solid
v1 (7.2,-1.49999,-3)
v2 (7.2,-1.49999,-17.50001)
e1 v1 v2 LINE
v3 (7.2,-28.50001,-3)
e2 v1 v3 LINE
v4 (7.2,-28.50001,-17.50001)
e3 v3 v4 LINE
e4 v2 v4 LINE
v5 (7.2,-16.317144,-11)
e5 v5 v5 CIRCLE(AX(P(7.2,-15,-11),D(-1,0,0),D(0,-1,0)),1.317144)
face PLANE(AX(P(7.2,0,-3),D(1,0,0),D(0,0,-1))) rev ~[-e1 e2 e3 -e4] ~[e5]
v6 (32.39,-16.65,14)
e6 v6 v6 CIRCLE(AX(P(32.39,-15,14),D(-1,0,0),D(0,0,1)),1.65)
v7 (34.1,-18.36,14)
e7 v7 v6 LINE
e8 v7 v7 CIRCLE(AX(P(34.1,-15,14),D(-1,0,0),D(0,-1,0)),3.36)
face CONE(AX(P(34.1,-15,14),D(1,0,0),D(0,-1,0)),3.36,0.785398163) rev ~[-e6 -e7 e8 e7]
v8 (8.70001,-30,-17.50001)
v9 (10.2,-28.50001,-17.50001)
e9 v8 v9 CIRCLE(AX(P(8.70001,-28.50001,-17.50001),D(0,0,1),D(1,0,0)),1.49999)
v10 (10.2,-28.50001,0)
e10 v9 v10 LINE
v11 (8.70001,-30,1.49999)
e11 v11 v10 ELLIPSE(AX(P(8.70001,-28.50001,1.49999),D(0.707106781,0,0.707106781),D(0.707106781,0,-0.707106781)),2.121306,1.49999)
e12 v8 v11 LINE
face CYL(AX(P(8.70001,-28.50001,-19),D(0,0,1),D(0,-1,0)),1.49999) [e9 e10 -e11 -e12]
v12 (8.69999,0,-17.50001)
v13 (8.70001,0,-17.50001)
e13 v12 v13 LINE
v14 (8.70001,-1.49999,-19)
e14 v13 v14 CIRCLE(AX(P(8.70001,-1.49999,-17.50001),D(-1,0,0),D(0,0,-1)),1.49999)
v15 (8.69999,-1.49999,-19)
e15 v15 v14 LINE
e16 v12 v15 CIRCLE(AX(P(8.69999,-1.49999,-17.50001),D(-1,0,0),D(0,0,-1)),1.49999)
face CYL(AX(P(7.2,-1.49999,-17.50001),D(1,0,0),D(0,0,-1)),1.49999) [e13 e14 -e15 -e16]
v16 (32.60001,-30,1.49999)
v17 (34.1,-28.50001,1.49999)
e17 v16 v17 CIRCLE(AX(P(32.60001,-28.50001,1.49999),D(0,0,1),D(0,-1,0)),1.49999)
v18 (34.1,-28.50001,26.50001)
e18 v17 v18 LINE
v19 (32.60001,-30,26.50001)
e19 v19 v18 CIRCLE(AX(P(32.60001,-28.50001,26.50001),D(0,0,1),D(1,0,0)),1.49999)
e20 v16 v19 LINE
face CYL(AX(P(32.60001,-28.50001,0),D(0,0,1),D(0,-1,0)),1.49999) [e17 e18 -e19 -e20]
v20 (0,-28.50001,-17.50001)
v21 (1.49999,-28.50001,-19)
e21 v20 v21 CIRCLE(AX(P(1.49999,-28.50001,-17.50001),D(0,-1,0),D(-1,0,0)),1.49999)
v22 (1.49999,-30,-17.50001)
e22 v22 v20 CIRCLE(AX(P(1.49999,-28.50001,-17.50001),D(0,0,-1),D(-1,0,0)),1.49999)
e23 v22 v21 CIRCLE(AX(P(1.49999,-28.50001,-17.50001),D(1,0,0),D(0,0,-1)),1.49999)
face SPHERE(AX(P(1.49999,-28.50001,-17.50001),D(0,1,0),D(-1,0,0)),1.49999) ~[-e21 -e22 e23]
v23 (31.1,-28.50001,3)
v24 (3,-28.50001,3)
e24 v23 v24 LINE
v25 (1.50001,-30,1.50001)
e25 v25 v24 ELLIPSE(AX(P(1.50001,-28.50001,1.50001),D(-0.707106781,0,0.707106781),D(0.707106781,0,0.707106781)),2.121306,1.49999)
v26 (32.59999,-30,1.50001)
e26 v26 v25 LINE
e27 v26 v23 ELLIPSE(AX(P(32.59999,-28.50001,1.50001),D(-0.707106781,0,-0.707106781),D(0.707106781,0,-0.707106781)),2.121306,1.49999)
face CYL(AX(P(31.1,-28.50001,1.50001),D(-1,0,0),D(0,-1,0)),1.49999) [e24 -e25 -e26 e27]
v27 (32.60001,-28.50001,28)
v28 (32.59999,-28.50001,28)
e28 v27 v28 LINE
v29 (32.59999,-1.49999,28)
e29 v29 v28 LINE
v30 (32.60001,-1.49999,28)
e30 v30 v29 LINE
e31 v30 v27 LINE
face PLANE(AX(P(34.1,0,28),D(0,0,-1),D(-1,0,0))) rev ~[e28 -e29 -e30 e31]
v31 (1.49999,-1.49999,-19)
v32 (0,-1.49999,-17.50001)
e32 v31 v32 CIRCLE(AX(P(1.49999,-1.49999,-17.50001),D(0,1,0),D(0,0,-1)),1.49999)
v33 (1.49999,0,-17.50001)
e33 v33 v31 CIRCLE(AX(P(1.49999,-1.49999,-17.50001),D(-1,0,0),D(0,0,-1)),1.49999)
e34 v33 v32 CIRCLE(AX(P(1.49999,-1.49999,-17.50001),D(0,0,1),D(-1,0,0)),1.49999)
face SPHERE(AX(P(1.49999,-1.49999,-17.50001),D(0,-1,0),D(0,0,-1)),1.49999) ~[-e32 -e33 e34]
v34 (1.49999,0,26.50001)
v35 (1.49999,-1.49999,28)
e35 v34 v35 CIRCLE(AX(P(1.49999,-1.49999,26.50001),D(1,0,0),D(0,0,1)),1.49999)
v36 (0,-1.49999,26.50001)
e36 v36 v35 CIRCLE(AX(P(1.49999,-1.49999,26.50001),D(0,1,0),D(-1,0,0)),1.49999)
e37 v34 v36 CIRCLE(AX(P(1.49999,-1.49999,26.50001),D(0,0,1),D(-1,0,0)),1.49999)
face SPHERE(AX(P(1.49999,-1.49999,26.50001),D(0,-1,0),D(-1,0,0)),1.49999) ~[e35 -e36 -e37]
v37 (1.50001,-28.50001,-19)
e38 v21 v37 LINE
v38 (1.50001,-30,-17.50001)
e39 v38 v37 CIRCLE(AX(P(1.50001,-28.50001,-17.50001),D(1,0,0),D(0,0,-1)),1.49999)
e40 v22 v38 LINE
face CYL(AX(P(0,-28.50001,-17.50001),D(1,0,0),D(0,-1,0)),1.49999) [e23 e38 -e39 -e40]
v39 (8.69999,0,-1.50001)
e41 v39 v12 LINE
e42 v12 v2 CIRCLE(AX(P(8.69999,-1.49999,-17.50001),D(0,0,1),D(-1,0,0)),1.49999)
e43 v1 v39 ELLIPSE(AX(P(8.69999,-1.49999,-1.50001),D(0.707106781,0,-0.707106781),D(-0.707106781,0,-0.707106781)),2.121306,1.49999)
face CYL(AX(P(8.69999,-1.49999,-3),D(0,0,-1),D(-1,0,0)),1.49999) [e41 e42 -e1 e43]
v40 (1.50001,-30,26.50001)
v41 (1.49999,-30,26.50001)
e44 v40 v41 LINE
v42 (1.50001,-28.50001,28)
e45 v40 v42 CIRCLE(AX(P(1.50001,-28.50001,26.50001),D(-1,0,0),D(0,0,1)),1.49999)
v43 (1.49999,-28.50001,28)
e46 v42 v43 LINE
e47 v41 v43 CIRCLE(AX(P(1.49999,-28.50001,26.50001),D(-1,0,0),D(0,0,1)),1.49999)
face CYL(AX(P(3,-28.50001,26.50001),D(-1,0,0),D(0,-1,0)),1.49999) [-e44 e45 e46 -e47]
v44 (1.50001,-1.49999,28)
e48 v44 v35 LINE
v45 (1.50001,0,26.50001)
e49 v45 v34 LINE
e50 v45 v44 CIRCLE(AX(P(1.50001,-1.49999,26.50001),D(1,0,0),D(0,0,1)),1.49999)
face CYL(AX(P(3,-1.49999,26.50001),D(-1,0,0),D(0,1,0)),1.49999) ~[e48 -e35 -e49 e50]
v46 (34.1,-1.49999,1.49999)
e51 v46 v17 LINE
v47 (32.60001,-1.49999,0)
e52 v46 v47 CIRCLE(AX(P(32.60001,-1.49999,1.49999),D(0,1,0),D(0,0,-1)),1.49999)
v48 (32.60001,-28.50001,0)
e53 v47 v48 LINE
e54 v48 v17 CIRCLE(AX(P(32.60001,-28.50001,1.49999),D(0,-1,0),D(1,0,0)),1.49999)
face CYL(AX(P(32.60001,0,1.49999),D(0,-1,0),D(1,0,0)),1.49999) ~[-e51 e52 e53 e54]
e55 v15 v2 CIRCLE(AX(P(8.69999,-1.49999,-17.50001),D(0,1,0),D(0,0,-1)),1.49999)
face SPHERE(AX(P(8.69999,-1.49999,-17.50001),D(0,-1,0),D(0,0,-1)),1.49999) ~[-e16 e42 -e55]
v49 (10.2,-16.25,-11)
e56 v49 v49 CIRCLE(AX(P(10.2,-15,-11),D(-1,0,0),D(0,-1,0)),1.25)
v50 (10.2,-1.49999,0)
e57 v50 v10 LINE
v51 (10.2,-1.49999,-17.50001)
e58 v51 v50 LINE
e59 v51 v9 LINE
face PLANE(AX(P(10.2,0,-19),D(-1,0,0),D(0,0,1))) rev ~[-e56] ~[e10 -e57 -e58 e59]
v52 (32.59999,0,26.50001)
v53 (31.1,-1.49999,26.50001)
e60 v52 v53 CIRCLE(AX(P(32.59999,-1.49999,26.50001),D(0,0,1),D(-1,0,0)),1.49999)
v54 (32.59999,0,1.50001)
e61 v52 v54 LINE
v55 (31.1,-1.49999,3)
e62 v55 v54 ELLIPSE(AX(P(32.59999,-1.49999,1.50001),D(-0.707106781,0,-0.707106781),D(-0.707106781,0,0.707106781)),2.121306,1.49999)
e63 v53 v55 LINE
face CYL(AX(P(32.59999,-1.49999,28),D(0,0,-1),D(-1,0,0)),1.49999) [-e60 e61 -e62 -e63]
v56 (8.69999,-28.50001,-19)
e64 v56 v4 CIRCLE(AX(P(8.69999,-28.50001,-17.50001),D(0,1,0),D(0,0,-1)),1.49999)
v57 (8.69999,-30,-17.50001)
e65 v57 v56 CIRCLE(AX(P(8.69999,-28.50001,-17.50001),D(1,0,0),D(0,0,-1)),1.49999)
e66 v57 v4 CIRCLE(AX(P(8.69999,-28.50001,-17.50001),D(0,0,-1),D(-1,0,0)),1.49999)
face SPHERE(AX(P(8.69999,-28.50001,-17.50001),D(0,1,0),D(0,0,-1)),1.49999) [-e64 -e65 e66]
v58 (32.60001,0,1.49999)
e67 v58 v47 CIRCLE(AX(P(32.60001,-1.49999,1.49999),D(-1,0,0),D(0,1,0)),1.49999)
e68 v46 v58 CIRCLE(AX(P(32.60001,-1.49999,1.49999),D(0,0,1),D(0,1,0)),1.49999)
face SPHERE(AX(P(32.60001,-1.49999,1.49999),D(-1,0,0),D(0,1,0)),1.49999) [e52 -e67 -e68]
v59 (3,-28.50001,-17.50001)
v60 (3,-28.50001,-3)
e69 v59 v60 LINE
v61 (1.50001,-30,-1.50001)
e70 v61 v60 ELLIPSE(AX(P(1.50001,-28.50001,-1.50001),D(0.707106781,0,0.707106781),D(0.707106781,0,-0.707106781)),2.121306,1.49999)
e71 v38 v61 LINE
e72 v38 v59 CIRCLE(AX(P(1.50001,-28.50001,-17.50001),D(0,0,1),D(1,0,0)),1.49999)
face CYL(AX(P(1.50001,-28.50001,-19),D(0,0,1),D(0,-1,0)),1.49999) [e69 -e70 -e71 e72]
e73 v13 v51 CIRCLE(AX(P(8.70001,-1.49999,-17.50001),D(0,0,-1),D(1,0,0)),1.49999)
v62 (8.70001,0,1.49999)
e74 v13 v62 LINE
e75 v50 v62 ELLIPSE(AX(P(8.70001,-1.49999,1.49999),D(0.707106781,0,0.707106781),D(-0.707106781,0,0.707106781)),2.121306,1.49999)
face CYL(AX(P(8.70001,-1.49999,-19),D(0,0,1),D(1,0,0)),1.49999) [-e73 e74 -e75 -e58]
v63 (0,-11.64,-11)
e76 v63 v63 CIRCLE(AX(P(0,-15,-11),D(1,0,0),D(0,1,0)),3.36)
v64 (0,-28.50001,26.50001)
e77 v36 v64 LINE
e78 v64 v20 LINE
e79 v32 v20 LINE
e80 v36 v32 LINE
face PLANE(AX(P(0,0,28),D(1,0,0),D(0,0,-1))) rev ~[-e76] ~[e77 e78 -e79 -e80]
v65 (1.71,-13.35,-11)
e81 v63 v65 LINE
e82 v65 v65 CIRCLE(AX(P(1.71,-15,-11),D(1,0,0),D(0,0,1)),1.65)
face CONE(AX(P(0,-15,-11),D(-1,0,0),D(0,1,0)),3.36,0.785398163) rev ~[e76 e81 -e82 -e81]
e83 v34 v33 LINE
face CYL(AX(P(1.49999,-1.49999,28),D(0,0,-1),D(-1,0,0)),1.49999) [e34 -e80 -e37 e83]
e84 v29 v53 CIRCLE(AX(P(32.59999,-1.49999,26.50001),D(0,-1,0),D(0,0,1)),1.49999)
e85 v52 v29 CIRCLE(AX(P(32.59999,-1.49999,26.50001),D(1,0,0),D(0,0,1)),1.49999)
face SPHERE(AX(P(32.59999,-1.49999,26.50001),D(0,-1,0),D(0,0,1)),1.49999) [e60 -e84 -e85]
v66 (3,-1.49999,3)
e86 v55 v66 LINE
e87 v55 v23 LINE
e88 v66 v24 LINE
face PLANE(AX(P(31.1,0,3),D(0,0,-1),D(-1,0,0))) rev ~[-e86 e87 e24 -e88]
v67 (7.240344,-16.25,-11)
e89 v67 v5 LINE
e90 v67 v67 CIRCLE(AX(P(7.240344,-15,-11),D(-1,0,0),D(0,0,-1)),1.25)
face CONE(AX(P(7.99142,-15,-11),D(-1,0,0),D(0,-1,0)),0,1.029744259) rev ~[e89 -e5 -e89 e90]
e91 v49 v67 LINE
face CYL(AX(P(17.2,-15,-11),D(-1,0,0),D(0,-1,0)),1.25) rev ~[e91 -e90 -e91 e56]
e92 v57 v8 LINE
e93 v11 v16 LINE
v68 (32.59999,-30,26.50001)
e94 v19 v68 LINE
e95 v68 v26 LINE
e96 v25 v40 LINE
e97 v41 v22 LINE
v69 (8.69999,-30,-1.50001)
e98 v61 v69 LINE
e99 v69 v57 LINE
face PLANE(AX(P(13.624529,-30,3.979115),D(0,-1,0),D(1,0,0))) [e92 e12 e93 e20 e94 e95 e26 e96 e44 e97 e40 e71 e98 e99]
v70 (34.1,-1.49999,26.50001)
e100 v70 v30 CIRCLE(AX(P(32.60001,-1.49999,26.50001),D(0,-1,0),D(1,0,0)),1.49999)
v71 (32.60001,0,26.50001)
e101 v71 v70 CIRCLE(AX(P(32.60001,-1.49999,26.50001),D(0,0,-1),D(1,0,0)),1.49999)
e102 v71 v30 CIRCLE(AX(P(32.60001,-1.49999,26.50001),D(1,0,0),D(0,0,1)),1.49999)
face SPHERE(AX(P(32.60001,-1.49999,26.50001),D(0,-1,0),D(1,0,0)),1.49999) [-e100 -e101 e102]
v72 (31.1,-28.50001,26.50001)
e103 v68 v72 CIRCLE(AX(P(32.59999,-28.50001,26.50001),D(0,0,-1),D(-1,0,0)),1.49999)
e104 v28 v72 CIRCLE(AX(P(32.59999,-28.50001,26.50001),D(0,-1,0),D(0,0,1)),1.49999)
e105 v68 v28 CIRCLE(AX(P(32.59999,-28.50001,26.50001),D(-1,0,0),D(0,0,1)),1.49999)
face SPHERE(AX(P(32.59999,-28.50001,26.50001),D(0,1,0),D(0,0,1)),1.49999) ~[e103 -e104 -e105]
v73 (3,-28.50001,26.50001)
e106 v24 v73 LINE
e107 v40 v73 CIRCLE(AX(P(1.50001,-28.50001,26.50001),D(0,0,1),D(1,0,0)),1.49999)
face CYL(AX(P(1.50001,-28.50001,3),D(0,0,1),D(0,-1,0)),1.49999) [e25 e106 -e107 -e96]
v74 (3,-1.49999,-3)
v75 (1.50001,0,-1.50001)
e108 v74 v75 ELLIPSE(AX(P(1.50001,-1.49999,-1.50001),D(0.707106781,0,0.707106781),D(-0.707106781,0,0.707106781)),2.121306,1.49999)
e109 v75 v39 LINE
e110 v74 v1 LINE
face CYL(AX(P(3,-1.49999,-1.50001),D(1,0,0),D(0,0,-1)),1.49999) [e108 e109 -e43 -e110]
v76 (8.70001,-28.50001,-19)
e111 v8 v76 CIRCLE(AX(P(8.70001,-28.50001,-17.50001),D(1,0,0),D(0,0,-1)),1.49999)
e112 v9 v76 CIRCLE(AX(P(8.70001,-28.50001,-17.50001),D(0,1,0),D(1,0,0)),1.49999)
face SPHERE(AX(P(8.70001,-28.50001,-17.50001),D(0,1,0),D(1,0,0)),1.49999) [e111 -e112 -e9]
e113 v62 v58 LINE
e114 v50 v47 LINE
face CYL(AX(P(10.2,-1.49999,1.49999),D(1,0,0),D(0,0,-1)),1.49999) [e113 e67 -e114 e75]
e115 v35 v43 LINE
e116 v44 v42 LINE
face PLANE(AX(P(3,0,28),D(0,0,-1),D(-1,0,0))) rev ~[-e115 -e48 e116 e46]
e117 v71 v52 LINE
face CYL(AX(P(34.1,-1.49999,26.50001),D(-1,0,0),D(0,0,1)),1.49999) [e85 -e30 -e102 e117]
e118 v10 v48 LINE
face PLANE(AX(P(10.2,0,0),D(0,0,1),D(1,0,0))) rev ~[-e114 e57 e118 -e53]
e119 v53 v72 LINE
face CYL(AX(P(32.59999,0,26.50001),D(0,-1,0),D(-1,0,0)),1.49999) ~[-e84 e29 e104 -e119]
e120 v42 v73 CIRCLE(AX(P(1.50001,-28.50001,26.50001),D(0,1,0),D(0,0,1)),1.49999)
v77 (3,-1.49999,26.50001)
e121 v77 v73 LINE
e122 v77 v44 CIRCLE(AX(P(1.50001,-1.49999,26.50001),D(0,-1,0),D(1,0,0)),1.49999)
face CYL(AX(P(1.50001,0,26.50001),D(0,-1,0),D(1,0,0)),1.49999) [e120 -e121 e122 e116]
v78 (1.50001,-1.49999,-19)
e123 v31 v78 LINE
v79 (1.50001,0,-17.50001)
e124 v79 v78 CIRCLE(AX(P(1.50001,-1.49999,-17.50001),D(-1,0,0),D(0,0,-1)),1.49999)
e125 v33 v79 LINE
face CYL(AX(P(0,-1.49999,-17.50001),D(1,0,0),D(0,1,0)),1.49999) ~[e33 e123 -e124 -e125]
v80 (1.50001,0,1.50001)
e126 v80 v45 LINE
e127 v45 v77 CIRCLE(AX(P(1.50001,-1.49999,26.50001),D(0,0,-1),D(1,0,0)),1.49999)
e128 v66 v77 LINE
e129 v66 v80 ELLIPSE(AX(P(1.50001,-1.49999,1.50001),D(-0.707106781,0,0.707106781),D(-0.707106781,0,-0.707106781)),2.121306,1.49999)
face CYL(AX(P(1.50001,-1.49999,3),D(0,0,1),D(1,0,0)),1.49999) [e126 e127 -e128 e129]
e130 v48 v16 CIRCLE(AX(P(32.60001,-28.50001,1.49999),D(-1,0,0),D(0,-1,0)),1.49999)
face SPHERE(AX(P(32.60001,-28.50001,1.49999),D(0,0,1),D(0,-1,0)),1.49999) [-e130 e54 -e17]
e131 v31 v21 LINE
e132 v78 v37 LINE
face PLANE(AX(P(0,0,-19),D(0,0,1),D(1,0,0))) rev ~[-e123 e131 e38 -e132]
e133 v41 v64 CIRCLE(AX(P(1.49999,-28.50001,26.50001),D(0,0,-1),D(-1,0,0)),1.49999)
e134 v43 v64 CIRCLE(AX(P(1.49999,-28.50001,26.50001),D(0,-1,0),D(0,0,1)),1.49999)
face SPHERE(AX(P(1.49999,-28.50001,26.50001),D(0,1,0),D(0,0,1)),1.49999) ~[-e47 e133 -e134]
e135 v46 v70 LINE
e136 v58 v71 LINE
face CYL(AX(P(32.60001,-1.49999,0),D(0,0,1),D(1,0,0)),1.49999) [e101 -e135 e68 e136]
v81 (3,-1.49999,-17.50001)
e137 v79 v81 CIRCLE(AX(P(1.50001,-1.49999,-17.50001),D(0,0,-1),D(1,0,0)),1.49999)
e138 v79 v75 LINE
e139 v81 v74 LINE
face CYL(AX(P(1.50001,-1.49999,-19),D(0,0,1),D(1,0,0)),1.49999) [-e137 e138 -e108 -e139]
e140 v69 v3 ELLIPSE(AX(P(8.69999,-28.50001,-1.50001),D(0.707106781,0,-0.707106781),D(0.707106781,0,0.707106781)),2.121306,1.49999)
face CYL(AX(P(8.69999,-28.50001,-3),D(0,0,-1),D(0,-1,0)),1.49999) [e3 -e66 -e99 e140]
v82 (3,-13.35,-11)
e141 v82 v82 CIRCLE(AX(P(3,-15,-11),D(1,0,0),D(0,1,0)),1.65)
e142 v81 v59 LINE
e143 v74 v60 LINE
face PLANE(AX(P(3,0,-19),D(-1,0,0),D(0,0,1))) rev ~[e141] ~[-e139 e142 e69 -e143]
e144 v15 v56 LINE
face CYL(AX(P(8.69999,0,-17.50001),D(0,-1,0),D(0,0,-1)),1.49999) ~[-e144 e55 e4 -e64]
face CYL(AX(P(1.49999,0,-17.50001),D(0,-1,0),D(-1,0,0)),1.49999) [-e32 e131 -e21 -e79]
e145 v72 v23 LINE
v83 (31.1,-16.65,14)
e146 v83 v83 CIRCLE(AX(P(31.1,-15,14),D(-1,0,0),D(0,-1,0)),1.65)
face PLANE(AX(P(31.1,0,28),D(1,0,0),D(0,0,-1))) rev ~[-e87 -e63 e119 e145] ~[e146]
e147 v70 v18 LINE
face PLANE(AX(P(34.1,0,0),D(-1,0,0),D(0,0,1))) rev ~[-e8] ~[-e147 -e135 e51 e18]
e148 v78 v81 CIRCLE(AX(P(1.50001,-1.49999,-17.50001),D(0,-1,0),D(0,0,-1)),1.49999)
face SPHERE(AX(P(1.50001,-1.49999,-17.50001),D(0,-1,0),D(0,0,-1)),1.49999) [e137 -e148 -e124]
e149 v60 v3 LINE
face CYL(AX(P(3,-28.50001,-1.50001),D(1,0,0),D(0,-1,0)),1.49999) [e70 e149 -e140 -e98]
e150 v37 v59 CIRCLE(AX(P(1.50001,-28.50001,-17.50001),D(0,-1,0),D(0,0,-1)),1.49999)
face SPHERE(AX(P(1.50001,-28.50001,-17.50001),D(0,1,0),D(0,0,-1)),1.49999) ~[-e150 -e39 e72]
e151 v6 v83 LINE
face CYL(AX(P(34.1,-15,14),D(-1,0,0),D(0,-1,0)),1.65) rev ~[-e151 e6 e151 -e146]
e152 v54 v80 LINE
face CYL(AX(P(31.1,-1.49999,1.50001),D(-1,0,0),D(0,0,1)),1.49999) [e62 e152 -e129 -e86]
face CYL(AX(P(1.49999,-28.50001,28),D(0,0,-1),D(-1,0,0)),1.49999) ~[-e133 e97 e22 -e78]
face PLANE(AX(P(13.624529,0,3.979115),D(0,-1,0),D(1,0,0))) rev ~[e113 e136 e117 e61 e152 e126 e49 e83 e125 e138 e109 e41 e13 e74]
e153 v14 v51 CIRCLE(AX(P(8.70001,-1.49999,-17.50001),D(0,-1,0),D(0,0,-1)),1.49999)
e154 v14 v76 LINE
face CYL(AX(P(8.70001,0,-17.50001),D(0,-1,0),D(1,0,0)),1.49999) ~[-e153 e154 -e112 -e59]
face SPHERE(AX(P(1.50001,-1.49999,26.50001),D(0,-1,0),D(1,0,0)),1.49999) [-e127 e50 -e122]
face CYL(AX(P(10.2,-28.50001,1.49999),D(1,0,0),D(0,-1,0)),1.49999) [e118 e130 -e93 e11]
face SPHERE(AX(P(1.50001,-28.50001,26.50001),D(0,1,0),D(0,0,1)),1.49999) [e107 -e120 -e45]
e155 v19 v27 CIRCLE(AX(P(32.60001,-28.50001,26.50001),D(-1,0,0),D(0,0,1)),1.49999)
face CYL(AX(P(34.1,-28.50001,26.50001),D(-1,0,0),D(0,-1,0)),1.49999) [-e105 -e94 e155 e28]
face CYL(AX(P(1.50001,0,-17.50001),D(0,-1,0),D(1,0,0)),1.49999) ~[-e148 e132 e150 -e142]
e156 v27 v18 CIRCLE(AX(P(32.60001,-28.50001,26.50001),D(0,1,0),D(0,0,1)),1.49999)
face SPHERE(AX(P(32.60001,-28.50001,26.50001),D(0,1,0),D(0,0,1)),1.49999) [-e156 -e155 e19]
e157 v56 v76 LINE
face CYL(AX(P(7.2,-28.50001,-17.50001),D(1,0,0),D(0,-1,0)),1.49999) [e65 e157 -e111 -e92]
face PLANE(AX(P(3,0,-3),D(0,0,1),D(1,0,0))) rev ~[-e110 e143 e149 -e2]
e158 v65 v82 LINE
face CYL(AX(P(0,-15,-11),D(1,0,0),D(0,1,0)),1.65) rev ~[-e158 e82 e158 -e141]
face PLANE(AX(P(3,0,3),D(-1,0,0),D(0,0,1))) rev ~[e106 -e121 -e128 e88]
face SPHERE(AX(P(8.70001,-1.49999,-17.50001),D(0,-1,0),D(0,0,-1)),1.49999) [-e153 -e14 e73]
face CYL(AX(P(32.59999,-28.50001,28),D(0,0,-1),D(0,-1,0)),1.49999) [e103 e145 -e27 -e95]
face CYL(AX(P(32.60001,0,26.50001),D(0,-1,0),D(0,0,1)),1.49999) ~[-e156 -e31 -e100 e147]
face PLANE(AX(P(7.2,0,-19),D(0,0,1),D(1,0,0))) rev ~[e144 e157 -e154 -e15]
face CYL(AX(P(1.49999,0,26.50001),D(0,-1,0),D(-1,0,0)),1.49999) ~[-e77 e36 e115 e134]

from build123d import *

# Parameters (mm, degrees)
F1_DEPTH       = 30
F3_D           = 3.3
F3_DEPTH       = 13.5
F3_CSINK_D     = 6.72
F3_CSINK_ANGLE = 90
F3_TIP         = 0.9914200214
F4_R           = 1.49999
F6_D           = 3.3
F6_DEPTH       = 7
F6_CSINK_D     = 6.72
F6_CSINK_ANGLE = 90
F6_TIP         = 0.9914200214
F8_D           = 2.5
F8_DEPTH       = 7
F8_TIP         = 0.7510757738


# Not quite as in the source:
# - a fillet or chamfer is up to 0.001 mm smaller than in the source, because OpenCascade refuses the exact size


with BuildPart() as f1:
    # F0 (on Front) → F1 (new body)
    with BuildSketch(Plane.XZ):
        Polygon((0, 28), (0, 0), (0, -19), (3, -19), (3, -3), (7.2, -3), (7.2, -19), (10.2, -19), (10.2, 0), (34.1, 0), (34.1, 28), (31.1, 28), (31.1, 3), (3, 3), (3, 28), align=None)
    extrude(amount=F1_DEPTH)

    # F3
    with Locations(Plane.YZ.offset(34.1)):
        with Locations((-15, 14)):
            CounterSinkHole(F3_D / 2, F3_CSINK_D / 2, depth=F3_DEPTH, counter_sink_angle=F3_CSINK_ANGLE)
            with Locations((0, 0, -(F3_DEPTH + F3_TIP / 2))):  # 118° drill point
                Cone(0, F3_D / 2, F3_TIP, mode=Mode.SUBTRACT)

    # F4 (radius 1.5 in the source; OpenCascade refuses exactly that, so slightly less here)
    f4_edges = [f1.edges().sort_by_distance(p)[0] for p in [
        (0, -15, -19),
        (3, -15, -19),
        (7.2, -15, -19),
        (10.2, -15, -19),
        (31.1, -15, 28),
        (34.1, -15, 28),
        (3, -15, 28),
        (0, -15, 28),
        (1.5, -30, 28),
        (32.6, -30, 28),
        (31.1, -30, 15.5),
        (34.1, -30, 14),
        (3, -30, 15.5),
        (0, -30, 4.5),
        (17.05, -30, 3),
        (22.15, -30, 0),
        (10.2, -30, -9.5),
        (1.5, -30, -19),
        (8.7, -30, -19),
        (1.5, 0, -19),
        (8.7, 0, -19),
        (0, 0, 4.5),
        (3, 0, -11),
        (7.2, 0, -11),
        (10.2, 0, -9.5),
        (17.05, 0, 3),
        (3, 0, 15.5),
        (22.15, 0, 0),
        (34.1, 0, 14),
        (34.1, -15, 0),
        (5.1, 0, -3),
        (5.1, -30, -3),
        (32.6, 0, 28),
        (1.5, 0, 28),
        (31.1, 0, 15.5),
        (3, -30, -11),
        (7.2, -30, -11),
    ]]
    fillet(f4_edges, radius=F4_R)

    # F6
    with Locations(Plane(origin=(0, 0, 0), x_dir=(0, -1, 0), z_dir=(-1, 0, 0))):
        with Locations((15, -11)):
            CounterSinkHole(F6_D / 2, F6_CSINK_D / 2, depth=F6_DEPTH, counter_sink_angle=F6_CSINK_ANGLE)
            with Locations((0, 0, -(F6_DEPTH + F6_TIP / 2))):  # 118° drill point
                Cone(0, F6_D / 2, F6_TIP, mode=Mode.SUBTRACT)

    # F8
    with Locations(Plane.YZ.offset(10.2)):
        with Locations((-15, -11)):
            Hole(F8_D / 2, depth=F8_DEPTH)
            with Locations((0, 0, -(F8_DEPTH + F8_TIP / 2))):  # 118° drill point
                Cone(0, F8_D / 2, F8_TIP, mode=Mode.SUBTRACT)


solid = f1.part
